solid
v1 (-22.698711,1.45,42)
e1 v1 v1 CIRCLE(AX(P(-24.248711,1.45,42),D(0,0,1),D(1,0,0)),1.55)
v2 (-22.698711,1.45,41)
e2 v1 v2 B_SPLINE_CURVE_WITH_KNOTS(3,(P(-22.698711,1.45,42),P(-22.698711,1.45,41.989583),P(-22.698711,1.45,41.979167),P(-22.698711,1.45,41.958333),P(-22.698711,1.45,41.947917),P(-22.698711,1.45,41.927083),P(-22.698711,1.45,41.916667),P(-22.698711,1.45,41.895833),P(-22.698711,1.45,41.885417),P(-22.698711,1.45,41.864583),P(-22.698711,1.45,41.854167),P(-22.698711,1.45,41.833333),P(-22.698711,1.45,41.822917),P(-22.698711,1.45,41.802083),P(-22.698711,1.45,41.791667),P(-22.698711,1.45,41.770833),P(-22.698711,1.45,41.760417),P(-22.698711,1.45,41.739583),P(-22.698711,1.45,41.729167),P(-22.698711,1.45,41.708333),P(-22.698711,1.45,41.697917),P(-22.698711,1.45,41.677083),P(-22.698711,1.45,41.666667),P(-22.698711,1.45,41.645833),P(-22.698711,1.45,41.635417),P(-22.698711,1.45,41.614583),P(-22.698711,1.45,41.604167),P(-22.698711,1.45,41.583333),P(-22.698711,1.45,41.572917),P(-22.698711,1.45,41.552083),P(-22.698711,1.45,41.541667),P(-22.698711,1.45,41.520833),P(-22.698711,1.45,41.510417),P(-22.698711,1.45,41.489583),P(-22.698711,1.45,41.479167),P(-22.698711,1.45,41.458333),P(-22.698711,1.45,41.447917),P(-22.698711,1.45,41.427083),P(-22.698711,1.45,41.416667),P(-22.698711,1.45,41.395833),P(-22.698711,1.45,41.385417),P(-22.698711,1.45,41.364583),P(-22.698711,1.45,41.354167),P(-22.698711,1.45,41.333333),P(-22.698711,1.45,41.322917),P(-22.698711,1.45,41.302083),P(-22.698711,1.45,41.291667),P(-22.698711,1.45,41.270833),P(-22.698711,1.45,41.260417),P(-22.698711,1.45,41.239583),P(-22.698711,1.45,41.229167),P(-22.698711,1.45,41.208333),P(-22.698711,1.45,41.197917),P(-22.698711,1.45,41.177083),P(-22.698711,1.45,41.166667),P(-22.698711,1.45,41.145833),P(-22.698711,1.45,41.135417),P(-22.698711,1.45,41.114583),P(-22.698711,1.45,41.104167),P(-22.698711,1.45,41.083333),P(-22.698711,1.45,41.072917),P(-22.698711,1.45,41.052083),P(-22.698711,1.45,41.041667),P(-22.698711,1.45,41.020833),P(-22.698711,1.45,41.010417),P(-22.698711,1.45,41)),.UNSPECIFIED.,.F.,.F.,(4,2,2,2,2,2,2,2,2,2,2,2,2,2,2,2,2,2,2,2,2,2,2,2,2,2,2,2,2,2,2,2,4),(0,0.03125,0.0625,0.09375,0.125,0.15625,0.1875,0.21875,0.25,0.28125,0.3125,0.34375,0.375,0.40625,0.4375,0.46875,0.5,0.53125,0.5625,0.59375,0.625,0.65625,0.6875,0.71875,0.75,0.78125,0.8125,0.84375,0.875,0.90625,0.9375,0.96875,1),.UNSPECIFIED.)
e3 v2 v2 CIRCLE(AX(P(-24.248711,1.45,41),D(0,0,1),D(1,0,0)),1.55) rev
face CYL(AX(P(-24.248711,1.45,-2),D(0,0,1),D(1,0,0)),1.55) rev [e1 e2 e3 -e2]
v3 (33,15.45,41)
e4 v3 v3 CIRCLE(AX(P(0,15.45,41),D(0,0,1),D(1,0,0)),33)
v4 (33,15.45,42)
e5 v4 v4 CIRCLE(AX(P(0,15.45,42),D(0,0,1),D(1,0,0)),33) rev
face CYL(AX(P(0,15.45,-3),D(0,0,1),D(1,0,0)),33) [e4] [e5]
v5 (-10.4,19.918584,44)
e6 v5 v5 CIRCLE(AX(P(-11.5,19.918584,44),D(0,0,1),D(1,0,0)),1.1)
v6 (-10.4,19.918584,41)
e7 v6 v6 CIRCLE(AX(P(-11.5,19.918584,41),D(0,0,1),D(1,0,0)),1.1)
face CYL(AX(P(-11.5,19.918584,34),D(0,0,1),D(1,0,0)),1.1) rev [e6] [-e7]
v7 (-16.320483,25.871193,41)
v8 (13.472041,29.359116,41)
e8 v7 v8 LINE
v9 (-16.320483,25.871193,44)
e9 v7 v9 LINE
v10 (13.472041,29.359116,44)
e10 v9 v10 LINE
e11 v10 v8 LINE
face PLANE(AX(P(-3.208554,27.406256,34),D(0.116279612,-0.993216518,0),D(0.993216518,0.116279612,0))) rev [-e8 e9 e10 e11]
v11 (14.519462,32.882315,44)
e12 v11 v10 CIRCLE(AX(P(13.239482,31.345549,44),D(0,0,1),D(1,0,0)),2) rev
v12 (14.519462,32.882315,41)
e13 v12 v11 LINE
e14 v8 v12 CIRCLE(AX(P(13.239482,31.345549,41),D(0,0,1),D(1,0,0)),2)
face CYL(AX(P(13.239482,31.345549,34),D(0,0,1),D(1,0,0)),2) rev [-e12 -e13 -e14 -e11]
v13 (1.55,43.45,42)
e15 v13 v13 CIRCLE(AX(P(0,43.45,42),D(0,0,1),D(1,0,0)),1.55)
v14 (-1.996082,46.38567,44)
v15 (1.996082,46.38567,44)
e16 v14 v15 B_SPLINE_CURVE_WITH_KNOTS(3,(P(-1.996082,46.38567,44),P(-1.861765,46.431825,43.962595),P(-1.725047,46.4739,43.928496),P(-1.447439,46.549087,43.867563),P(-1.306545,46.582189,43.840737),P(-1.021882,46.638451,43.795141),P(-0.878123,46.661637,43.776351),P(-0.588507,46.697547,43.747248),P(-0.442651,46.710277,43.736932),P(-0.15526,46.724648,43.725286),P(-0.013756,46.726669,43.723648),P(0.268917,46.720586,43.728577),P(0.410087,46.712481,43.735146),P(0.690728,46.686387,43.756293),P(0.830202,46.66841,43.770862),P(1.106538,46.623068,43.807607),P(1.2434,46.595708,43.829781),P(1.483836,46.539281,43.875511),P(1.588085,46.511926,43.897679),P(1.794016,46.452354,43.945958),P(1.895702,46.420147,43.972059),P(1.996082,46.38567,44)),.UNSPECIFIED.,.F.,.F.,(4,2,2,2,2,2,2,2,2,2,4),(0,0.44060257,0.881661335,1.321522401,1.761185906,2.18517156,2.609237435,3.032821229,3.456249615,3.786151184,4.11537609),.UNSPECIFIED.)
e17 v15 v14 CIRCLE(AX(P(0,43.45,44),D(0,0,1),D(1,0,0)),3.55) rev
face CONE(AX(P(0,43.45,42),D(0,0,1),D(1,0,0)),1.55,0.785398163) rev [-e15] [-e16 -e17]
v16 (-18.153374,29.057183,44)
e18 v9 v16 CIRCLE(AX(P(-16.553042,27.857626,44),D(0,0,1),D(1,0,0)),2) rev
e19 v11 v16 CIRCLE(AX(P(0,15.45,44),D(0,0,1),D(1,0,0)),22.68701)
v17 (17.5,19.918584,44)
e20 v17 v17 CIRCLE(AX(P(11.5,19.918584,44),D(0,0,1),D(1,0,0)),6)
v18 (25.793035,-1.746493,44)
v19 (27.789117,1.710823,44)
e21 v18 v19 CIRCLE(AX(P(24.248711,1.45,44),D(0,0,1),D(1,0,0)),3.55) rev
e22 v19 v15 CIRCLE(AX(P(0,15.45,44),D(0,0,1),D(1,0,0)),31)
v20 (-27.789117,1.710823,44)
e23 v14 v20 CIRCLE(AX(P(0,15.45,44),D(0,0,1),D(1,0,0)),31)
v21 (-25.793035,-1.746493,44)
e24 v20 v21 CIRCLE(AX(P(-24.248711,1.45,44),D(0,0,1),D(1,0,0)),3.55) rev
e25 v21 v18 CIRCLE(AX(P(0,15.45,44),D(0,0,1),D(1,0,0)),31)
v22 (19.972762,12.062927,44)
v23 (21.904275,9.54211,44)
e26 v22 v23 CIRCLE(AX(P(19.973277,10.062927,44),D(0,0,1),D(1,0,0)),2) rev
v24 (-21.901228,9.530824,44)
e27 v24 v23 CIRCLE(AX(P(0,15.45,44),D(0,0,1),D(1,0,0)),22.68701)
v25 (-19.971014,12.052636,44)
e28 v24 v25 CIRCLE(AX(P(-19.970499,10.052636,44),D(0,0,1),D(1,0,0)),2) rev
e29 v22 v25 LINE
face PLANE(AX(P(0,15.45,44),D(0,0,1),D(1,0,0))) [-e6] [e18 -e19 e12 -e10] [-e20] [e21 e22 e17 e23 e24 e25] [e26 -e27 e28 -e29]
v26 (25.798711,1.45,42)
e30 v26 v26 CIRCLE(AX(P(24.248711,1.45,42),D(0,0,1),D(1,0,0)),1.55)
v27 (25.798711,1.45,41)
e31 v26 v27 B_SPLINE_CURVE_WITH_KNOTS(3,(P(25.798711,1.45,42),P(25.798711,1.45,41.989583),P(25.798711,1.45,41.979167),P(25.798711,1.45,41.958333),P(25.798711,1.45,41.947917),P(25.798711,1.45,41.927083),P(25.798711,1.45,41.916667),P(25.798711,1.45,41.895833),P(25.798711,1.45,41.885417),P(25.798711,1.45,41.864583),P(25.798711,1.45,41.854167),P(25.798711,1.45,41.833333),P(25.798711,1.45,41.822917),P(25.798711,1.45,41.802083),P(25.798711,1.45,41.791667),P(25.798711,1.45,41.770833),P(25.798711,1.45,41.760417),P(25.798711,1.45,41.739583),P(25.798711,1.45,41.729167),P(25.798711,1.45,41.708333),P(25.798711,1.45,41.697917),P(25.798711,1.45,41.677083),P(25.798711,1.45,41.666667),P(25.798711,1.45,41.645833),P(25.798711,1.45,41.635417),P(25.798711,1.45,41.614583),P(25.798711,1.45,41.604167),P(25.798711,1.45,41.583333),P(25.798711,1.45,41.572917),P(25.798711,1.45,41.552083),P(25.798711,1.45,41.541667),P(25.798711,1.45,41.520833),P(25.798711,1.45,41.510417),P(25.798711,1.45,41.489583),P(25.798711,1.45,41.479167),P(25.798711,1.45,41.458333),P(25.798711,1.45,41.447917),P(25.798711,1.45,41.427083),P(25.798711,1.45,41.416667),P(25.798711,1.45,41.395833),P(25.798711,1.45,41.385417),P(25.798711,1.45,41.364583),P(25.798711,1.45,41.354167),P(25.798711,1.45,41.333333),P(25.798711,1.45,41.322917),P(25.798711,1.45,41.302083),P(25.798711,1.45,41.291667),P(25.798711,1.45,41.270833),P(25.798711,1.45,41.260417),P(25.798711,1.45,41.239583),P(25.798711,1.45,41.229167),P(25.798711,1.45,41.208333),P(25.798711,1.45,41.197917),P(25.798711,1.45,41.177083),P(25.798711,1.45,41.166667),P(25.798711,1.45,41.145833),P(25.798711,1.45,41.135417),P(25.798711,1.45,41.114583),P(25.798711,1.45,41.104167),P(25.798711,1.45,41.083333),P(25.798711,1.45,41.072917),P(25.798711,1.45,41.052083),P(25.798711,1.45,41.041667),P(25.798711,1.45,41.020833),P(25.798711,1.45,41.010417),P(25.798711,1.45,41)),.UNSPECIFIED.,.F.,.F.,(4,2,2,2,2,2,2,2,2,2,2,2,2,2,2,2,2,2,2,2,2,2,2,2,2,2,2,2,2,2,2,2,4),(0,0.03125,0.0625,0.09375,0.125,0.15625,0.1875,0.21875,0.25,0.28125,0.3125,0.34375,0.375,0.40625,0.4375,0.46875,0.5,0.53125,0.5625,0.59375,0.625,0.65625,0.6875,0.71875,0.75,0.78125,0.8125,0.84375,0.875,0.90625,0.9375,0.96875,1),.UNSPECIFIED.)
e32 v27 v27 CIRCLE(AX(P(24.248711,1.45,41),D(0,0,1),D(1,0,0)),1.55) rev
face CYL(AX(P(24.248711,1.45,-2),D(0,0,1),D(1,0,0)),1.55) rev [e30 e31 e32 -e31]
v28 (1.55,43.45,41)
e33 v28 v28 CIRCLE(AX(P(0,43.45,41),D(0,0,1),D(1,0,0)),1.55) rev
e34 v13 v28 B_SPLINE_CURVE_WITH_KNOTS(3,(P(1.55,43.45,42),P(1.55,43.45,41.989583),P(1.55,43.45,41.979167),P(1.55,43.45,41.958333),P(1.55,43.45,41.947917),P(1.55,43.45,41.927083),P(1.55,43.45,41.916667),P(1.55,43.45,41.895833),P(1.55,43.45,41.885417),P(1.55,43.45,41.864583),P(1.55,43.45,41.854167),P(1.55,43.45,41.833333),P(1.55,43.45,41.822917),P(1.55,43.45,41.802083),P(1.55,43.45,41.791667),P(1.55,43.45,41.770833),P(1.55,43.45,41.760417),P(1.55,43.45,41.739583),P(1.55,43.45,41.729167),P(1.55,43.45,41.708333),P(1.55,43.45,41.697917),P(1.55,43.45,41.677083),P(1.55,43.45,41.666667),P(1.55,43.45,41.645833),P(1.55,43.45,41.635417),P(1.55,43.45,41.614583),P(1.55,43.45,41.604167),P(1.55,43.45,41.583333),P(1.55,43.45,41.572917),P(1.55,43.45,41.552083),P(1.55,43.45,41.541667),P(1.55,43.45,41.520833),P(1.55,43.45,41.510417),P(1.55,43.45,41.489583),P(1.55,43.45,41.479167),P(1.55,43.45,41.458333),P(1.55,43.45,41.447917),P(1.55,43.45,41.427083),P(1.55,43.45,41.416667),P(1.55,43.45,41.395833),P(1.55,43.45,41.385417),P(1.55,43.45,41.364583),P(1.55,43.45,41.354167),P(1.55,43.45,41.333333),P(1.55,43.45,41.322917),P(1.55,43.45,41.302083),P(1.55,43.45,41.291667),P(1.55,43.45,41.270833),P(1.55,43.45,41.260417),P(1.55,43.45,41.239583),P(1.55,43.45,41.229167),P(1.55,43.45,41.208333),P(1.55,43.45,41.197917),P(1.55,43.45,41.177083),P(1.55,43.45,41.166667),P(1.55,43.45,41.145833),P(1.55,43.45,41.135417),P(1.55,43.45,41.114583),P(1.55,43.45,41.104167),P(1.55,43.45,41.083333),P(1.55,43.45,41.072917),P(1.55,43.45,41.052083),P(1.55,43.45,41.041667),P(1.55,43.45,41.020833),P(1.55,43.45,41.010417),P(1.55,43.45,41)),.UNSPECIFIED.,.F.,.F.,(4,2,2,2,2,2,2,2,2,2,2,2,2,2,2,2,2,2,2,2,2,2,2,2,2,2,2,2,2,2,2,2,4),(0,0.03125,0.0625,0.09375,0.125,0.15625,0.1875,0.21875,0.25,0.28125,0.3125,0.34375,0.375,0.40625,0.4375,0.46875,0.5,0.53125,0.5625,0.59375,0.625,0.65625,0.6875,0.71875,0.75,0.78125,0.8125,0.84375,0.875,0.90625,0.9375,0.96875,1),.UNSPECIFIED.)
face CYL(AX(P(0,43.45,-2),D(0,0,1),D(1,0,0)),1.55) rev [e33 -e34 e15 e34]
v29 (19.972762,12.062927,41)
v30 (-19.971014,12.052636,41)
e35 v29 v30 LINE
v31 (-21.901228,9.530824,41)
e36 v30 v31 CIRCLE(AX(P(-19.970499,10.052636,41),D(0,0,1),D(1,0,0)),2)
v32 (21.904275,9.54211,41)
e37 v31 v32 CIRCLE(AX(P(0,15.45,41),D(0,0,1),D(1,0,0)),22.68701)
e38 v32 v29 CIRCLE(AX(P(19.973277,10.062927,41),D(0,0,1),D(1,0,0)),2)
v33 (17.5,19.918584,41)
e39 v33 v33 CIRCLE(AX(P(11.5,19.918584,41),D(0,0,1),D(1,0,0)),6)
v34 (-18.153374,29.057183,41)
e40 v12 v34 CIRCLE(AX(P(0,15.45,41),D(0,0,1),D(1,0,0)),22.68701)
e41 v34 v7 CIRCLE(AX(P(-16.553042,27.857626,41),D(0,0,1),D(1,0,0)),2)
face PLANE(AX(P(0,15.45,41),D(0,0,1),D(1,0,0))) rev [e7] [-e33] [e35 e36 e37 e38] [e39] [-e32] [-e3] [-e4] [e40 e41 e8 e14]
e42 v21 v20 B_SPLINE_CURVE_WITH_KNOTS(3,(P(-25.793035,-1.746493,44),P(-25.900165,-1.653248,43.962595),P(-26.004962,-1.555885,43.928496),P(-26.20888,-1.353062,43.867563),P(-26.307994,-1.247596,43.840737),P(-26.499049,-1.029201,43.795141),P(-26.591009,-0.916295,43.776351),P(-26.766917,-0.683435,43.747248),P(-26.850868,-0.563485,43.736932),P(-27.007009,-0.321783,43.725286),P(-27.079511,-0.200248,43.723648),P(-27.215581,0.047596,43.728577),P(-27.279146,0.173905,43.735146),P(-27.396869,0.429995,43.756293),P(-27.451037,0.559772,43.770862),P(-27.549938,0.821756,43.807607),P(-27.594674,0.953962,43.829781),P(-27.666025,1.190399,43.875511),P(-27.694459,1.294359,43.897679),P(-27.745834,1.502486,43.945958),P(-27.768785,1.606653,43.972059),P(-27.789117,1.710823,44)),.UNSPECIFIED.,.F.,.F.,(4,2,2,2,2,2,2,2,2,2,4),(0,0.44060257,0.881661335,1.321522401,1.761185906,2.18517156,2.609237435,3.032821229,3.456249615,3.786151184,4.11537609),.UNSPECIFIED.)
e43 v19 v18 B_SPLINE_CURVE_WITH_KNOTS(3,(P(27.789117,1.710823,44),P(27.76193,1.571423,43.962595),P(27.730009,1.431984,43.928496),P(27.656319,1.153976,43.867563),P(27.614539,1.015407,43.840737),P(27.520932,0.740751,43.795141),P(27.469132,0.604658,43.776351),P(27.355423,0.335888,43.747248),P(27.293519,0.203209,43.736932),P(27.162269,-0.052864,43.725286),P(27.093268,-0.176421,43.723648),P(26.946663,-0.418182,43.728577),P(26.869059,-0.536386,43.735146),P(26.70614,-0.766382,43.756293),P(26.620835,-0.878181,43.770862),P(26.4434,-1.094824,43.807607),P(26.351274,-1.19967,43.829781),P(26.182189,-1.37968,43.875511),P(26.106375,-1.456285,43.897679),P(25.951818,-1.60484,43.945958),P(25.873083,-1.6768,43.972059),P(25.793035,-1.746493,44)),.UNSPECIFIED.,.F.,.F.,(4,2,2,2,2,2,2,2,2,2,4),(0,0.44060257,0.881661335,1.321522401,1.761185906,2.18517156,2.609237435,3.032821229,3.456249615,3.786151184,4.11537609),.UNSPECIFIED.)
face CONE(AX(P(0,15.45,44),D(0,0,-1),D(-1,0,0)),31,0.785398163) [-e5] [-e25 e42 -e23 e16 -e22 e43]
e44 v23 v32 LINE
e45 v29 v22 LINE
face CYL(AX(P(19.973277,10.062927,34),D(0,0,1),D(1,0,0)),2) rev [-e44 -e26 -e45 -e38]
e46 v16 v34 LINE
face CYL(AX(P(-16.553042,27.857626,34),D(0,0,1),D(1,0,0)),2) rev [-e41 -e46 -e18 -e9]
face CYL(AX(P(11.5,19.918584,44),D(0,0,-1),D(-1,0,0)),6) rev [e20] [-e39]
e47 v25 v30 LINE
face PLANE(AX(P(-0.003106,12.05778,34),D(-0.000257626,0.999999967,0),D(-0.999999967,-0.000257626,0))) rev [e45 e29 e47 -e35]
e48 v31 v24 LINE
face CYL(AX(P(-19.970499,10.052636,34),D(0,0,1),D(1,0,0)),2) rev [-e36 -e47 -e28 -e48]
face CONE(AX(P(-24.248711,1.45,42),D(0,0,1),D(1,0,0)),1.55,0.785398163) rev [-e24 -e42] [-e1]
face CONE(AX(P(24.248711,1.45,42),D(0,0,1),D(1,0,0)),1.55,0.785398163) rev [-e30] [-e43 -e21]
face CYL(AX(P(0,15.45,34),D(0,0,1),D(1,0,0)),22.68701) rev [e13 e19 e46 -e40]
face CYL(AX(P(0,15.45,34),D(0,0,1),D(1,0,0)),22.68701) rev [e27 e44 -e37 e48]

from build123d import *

# Parameters (mm, degrees)
SKETCH1_R                = 15.45
SKETCH1_R_2              = 12.45
SKETCH1_R_3              = 33
SKETCH1_R_4              = 30
SKETCH1_R_5              = 4.05
SKETCH1_R_6              = 1.05
BOSS_EXTRUDE2_DEPTH      = 12.4
BOSS_EXTRUDE3_START      = 3
SKETCH2_R                = 33
BOSS_EXTRUDE3_DEPTH      = 3
SKETCH3_R                = 33
SKETCH3_R_2              = 30
BOSS_EXTRUDE4_DEPTH      = 28.6
FILLET1_R                = 10
BOSS_EXTRUDE5_DEPTH      = 12.4
CHAMFER1_SIZE            = 4
FILLET2_R                = 5
BOSS_EXTRUDE6_DEPTH      = 28.6
BOSS_EXTRUDE6_DEPTH_BACK = 14.4
SKETCH5_R                = 4.55
SKETCH5_R_2              = 1.55
FILLET3_R                = 5
CHAMFER2_SIZE            = 2
SKETCH6_W                = 4
SKETCH6_H                = 2
CUT_EXTRUDE1_DEPTH       = 23.4
SKETCH7_R                = 33
SKETCH7_R_2              = 1.55
SKETCH7_R_3              = 6
BOSS_EXTRUDE7_DEPTH      = 3
CUT_EXTRUDE3_START       = -3
SKETCH8_R                = 60.265040847
CUT_EXTRUDE3_DEPTH       = 127
CHAMFER3_SIZE            = 2
CUT_EXTRUDE4_DEPTH       = 10
FILLET4_R                = 2
SKETCH10_R               = 1.1
CUT_EXTRUDE5_DEPTH       = 10
CHAMFER4_SIZE            = 2


with BuildPart() as part:
    # Sketch1 → Boss-Extrude2 (new body)
    # profile 1 of 4: a face of its own
    with BuildSketch(Plane.XY):
        Circle(SKETCH1_R)
        with Locations(Location((0, 0, 0), (0, 0, 180))):
            Circle(SKETCH1_R_2, mode=Mode.SUBTRACT)
    # profile 2 of 4: a face of its own
    with BuildSketch(Plane.XY):
        with Locations(Location((0, 15.45, 0), (0, 0, 180))):
            Circle(SKETCH1_R_3)
        with Locations((0, 15.45)):
            Circle(SKETCH1_R_4, mode=Mode.SUBTRACT)
    # profile 3 of 4: a face of its own
    with BuildSketch(Plane.XY):
        with Locations(Location((11.5, 19.918584287, 0), (0, 0, 180))):
            Circle(SKETCH1_R_5)
        with Locations(Location((11.5, 19.918584287, 0), (0, 0, 180))):
            Circle(SKETCH1_R_6, mode=Mode.SUBTRACT)
    # profile 4 of 4: a face of its own
    with BuildSketch(Plane.XY):
        with Locations(Location((-11.5, 19.918584287, 0), (0, 0, 180))):
            Circle(SKETCH1_R_5)
        with Locations(Location((-11.5, 19.918584287, 0), (0, 0, 180))):
            Circle(SKETCH1_R_6, mode=Mode.SUBTRACT)
    extrude(amount=BOSS_EXTRUDE2_DEPTH)

    # Sketch2 → Boss-Extrude3 (add)
    with BuildSketch(Plane(origin=(0, 0, 0), x_dir=(-1, 0, 0), z_dir=(0, 0, -1)).offset(BOSS_EXTRUDE3_START)):
        with Locations(Location((0, 15.45, 0), (0, 0, 180))):
            Circle(SKETCH2_R)
    extrude(amount=-BOSS_EXTRUDE3_DEPTH)

    # Sketch3 → Boss-Extrude4 (add)
    with BuildSketch(Plane.XY.offset(12.4)):
        with Locations((0, 15.45)):
            Circle(SKETCH3_R)
        with Locations(Location((0, 15.45, 0), (0, 0, 256.137567884))):
            Circle(SKETCH3_R_2, mode=Mode.SUBTRACT)
    extrude(amount=BOSS_EXTRUDE4_DEPTH)

    # Fillet1
    # the kernel refuses this fillet: 10 mm, written as the material it adds along each edge
    with BuildSketch(Plane(origin=(-7.18774525, -13.676213592, 12.4), x_dir=(-0.20848530714015037, 0.9780254990063793, 0), z_dir=(0, 0, -1))) as fillet1_piece_1:
        with BuildLine():
            CenterArc((31.441766058, -6.395526036), FILLET1_R, 140.241533635, 142.62650255)
            ThreePointArc((33.668828933, -16.144381915), (14.016585538, -13.948724396), (0, 0))
            ThreePointArc((0, 0), (11.877146347, -5.568912274), (23.754292694, 0))
        make_face()
    extrude(amount=12.4)
    with BuildSketch(Plane(origin=(7.18774525, -13.676213592, 12.4), x_dir=(0.20848530714015037, 0.9780254990063793, 0), z_dir=(0, 0, -1))) as fillet1_piece_2:
        with BuildLine():
            CenterArc((31.441766058, 6.395526036), FILLET1_R, 77.131963815, 142.62650255)
            ThreePointArc((33.668828933, 16.144381915), (14.016585538, 13.948724396), (0, 0))
            ThreePointArc((0, 0), (11.877146347, 5.568912274), (23.754292694, 0))
        make_face()
    extrude(amount=12.4)

    # Sketch4 → Boss-Extrude5 (add)
    with BuildSketch(Plane.XY):
        Polygon((-15.355968184, 18.680032971), (-12.140166258, 9.556090373), (-4.457434094, 12.838952207), (4.080215127, 12.838952207), (12.140166258, 9.556090373), (15.355968184, 18.680032971), (9.70403689, 17.830268754), (8.160430255, 22.209822799), (0, 15.45), (-8.160430255, 22.209822799), (-10.090971595, 17.830268754), align=None)
    extrude(amount=BOSS_EXTRUDE5_DEPTH)

    # Chamfer1
    chamfer1_edges = [part.edges().sort_by_distance(p)[0] for p in [
        (0, 45.45, 0),
        (-23.339432443, 6.316081984, 0),
        (23.339432443, 6.316081984, 0),
    ]]
    chamfer(chamfer1_edges, length=CHAMFER1_SIZE)

    # Fillet2
    # the kernel refuses this fillet: 5 mm, written as the material it adds along each edge
    with BuildSketch(Plane(origin=(-11.5, 19.918584287, 0), x_dir=(0.4626548968458433, -0.8865384630260337, 0), z_dir=(0.8865384630260337, 0.4626548968458433, 0))) as fillet2_piece_1:
        with BuildLine():
            CenterArc((4.05 + FILLET2_R, -FILLET2_R), FILLET2_R, 90, 90)
            Line((4.05, -FILLET2_R), (4.05, 0))
            Line((4.05, 0), (4.05 + FILLET2_R, 0))
        make_face()
    revolve(axis=Axis((-11.5, 19.918584287, 0), (0, 0, -1)), revolution_arc=359.64)
    with BuildSketch(Plane(origin=(11.5, 19.918584287, 0), x_dir=(-0.4682160132284685, -0.8836140361925214, 0), z_dir=(0.8836140361925214, -0.4682160132284685, 0))) as fillet2_piece_2:
        with BuildLine():
            CenterArc((4.05 + FILLET2_R, -FILLET2_R), FILLET2_R, 90, 90)
            Line((4.05, -FILLET2_R), (4.05, 0))
            Line((4.05, 0), (4.05 + FILLET2_R, 0))
        make_face()
    revolve(axis=Axis((11.5, 19.918584287, 0), (0, 0, -1)), revolution_arc=359.64)

    # Sketch5 → Boss-Extrude6 (add, two sides: drawn at the far end of the back side and taken through both)
    # profile 1 of 3: a face of its own
    with BuildSketch(Plane.XY.offset(12.4).offset(-BOSS_EXTRUDE6_DEPTH_BACK)):
        with Locations((0, 43.45)):
            Circle(SKETCH5_R)
        with Locations((0, 43.45)):
            Circle(SKETCH5_R_2, mode=Mode.SUBTRACT)
    # profile 2 of 3: a face of its own
    with BuildSketch(Plane.XY.offset(12.4).offset(-BOSS_EXTRUDE6_DEPTH_BACK)):
        with Locations((24.248711306, 1.45)):
            Circle(SKETCH5_R)
        with Locations((24.248711306, 1.45)):
            Circle(SKETCH5_R_2, mode=Mode.SUBTRACT)
    # profile 3 of 3: a face of its own
    with BuildSketch(Plane.XY.offset(12.4).offset(-BOSS_EXTRUDE6_DEPTH_BACK)):
        with Locations((-24.248711306, 1.45)):
            Circle(SKETCH5_R)
        with Locations((-24.248711306, 1.45)):
            Circle(SKETCH5_R_2, mode=Mode.SUBTRACT)
    extrude(amount=BOSS_EXTRUDE6_DEPTH + BOSS_EXTRUDE6_DEPTH_BACK)

    # Fillet3
    fillet3_edges = [part.edges().sort_by_distance(p)[0] for p in [
        (23.612570286, -3.055310711, 26.7),
        (27.832354323, 4.25356964, 26.7),
        (-27.832354323, 4.25356964, 26.7),
        (-23.612570286, -3.055310711, 26.7),
        (4.219784038, 45.151741071, 22.5),
        (-4.219784038, 45.151741071, 22.5),
    ]]
    fillet(fillet3_edges, radius=FILLET3_R)

    # Chamfer2
    chamfer2_edges = [part.edges().sort_by_distance(p)[0] for p in [
        (-33, 15.45, -3),
    ]]
    chamfer(chamfer2_edges, length=CHAMFER2_SIZE)

    # Sketch6 → Cut-Extrude1 (cut)
    with BuildSketch(Plane.XY.offset(12.4)):
        with Locations((0, -13.034949107)):
            Rectangle(SKETCH6_W, SKETCH6_H)
    extrude(amount=-CUT_EXTRUDE1_DEPTH, mode=Mode.SUBTRACT)

    # Sketch7 → Boss-Extrude7 (add)
    with BuildSketch(Plane.XY.offset(41)):
        with Locations((0, 15.45)):
            Circle(SKETCH7_R)
        with Locations((-24.248711306, 1.45)):
            Circle(SKETCH7_R_2, mode=Mode.SUBTRACT)
        with Locations((24.248711306, 1.45)):
            Circle(SKETCH7_R_2, mode=Mode.SUBTRACT)
        with Locations((0, 43.45)):
            Circle(SKETCH7_R_2, mode=Mode.SUBTRACT)
        with Locations((11.5, 19.918584287)):
            Circle(SKETCH7_R_3, mode=Mode.SUBTRACT)
    extrude(amount=BOSS_EXTRUDE7_DEPTH)

    # Sketch8 → Cut-Extrude3 (cut)
    with BuildSketch(Plane.XY.offset(44).offset(CUT_EXTRUDE3_START)):
        with Locations((3.003651401, 17.042715902)):
            Circle(SKETCH8_R)
    extrude(amount=-CUT_EXTRUDE3_DEPTH, mode=Mode.SUBTRACT)

    # Chamfer3
    chamfer3_edges = [part.edges().sort_by_distance(p)[0] for p in [
        (-33, 15.45, 44),
    ]]
    chamfer(chamfer3_edges, length=CHAMFER3_SIZE)

    # Sketch9 → Cut-Extrude4 (cut)
    with BuildSketch(Plane.XY.offset(44)):
        with BuildLine():
            ThreePointArc((17.542861073, 29.835702421), (-2.638036688, 37.983112773), (-20.39130231, 25.394606522))
            Line((-20.39130231, 25.394606522), (17.542861073, 29.835702421))
        make_face()
        with BuildLine():
            Line((22.432842806, 12.063560512), (-22.43109496, 12.052002402))
            ThreePointArc((-22.43109496, 12.052002402), (0.00584476, -7.23700894), (22.432842806, 12.063560512))
        make_face()
    extrude(amount=-CUT_EXTRUDE4_DEPTH, mode=Mode.SUBTRACT)

    # Fillet4
    fillet4_edges = [part.edges().sort_by_distance(p)[0] for p in [
        (17.542861073, 29.835702421, 42.5),
        (-20.39130231, 25.394606522, 42.5),
        (-22.43109496, 12.052002402, 42.5),
        (22.432842806, 12.063560512, 42.5),
    ]]
    fillet(fillet4_edges, radius=FILLET4_R)

    # Sketch10 → Cut-Extrude5 (cut)
    with BuildSketch(Plane.XY.offset(44)):
        with Locations((-11.5, 19.918584287)):
            Circle(SKETCH10_R)
    extrude(amount=-CUT_EXTRUDE5_DEPTH, mode=Mode.SUBTRACT)

    # Chamfer4
    # the kernel refuses this chamfer: 2 mm, written as the material it takes off along each edge
    with BuildSketch(Plane(origin=(0, 43.45, 44), x_dir=(1, 0, 0), z_dir=(0, -1, 0))) as chamfer4_piece_1:
        Polygon((1.55, -CHAMFER4_SIZE), (1.55 + CHAMFER4_SIZE, 0), (1.55, 0), align=None)
    revolve(axis=Axis((0, 43.45, 44), (0, 0, 1)), mode=Mode.SUBTRACT)
    with BuildSketch(Plane(origin=(-24.248711306, 1.45, 44), x_dir=(1, 0, 0), z_dir=(0, -1, 0))) as chamfer4_piece_2:
        Polygon((1.55, -CHAMFER4_SIZE), (1.55 + CHAMFER4_SIZE, 0), (1.55, 0), align=None)
    revolve(axis=Axis((-24.248711306, 1.45, 44), (0, 0, 1)), mode=Mode.SUBTRACT)
    with BuildSketch(Plane(origin=(24.248711306, 1.45, 44), x_dir=(1, 0, 0), z_dir=(0, -1, 0))) as chamfer4_piece_3:
        Polygon((1.55, -CHAMFER4_SIZE), (1.55 + CHAMFER4_SIZE, 0), (1.55, 0), align=None)
    revolve(axis=Axis((24.248711306, 1.45, 44), (0, 0, 1)), mode=Mode.SUBTRACT)


solid = part.part
